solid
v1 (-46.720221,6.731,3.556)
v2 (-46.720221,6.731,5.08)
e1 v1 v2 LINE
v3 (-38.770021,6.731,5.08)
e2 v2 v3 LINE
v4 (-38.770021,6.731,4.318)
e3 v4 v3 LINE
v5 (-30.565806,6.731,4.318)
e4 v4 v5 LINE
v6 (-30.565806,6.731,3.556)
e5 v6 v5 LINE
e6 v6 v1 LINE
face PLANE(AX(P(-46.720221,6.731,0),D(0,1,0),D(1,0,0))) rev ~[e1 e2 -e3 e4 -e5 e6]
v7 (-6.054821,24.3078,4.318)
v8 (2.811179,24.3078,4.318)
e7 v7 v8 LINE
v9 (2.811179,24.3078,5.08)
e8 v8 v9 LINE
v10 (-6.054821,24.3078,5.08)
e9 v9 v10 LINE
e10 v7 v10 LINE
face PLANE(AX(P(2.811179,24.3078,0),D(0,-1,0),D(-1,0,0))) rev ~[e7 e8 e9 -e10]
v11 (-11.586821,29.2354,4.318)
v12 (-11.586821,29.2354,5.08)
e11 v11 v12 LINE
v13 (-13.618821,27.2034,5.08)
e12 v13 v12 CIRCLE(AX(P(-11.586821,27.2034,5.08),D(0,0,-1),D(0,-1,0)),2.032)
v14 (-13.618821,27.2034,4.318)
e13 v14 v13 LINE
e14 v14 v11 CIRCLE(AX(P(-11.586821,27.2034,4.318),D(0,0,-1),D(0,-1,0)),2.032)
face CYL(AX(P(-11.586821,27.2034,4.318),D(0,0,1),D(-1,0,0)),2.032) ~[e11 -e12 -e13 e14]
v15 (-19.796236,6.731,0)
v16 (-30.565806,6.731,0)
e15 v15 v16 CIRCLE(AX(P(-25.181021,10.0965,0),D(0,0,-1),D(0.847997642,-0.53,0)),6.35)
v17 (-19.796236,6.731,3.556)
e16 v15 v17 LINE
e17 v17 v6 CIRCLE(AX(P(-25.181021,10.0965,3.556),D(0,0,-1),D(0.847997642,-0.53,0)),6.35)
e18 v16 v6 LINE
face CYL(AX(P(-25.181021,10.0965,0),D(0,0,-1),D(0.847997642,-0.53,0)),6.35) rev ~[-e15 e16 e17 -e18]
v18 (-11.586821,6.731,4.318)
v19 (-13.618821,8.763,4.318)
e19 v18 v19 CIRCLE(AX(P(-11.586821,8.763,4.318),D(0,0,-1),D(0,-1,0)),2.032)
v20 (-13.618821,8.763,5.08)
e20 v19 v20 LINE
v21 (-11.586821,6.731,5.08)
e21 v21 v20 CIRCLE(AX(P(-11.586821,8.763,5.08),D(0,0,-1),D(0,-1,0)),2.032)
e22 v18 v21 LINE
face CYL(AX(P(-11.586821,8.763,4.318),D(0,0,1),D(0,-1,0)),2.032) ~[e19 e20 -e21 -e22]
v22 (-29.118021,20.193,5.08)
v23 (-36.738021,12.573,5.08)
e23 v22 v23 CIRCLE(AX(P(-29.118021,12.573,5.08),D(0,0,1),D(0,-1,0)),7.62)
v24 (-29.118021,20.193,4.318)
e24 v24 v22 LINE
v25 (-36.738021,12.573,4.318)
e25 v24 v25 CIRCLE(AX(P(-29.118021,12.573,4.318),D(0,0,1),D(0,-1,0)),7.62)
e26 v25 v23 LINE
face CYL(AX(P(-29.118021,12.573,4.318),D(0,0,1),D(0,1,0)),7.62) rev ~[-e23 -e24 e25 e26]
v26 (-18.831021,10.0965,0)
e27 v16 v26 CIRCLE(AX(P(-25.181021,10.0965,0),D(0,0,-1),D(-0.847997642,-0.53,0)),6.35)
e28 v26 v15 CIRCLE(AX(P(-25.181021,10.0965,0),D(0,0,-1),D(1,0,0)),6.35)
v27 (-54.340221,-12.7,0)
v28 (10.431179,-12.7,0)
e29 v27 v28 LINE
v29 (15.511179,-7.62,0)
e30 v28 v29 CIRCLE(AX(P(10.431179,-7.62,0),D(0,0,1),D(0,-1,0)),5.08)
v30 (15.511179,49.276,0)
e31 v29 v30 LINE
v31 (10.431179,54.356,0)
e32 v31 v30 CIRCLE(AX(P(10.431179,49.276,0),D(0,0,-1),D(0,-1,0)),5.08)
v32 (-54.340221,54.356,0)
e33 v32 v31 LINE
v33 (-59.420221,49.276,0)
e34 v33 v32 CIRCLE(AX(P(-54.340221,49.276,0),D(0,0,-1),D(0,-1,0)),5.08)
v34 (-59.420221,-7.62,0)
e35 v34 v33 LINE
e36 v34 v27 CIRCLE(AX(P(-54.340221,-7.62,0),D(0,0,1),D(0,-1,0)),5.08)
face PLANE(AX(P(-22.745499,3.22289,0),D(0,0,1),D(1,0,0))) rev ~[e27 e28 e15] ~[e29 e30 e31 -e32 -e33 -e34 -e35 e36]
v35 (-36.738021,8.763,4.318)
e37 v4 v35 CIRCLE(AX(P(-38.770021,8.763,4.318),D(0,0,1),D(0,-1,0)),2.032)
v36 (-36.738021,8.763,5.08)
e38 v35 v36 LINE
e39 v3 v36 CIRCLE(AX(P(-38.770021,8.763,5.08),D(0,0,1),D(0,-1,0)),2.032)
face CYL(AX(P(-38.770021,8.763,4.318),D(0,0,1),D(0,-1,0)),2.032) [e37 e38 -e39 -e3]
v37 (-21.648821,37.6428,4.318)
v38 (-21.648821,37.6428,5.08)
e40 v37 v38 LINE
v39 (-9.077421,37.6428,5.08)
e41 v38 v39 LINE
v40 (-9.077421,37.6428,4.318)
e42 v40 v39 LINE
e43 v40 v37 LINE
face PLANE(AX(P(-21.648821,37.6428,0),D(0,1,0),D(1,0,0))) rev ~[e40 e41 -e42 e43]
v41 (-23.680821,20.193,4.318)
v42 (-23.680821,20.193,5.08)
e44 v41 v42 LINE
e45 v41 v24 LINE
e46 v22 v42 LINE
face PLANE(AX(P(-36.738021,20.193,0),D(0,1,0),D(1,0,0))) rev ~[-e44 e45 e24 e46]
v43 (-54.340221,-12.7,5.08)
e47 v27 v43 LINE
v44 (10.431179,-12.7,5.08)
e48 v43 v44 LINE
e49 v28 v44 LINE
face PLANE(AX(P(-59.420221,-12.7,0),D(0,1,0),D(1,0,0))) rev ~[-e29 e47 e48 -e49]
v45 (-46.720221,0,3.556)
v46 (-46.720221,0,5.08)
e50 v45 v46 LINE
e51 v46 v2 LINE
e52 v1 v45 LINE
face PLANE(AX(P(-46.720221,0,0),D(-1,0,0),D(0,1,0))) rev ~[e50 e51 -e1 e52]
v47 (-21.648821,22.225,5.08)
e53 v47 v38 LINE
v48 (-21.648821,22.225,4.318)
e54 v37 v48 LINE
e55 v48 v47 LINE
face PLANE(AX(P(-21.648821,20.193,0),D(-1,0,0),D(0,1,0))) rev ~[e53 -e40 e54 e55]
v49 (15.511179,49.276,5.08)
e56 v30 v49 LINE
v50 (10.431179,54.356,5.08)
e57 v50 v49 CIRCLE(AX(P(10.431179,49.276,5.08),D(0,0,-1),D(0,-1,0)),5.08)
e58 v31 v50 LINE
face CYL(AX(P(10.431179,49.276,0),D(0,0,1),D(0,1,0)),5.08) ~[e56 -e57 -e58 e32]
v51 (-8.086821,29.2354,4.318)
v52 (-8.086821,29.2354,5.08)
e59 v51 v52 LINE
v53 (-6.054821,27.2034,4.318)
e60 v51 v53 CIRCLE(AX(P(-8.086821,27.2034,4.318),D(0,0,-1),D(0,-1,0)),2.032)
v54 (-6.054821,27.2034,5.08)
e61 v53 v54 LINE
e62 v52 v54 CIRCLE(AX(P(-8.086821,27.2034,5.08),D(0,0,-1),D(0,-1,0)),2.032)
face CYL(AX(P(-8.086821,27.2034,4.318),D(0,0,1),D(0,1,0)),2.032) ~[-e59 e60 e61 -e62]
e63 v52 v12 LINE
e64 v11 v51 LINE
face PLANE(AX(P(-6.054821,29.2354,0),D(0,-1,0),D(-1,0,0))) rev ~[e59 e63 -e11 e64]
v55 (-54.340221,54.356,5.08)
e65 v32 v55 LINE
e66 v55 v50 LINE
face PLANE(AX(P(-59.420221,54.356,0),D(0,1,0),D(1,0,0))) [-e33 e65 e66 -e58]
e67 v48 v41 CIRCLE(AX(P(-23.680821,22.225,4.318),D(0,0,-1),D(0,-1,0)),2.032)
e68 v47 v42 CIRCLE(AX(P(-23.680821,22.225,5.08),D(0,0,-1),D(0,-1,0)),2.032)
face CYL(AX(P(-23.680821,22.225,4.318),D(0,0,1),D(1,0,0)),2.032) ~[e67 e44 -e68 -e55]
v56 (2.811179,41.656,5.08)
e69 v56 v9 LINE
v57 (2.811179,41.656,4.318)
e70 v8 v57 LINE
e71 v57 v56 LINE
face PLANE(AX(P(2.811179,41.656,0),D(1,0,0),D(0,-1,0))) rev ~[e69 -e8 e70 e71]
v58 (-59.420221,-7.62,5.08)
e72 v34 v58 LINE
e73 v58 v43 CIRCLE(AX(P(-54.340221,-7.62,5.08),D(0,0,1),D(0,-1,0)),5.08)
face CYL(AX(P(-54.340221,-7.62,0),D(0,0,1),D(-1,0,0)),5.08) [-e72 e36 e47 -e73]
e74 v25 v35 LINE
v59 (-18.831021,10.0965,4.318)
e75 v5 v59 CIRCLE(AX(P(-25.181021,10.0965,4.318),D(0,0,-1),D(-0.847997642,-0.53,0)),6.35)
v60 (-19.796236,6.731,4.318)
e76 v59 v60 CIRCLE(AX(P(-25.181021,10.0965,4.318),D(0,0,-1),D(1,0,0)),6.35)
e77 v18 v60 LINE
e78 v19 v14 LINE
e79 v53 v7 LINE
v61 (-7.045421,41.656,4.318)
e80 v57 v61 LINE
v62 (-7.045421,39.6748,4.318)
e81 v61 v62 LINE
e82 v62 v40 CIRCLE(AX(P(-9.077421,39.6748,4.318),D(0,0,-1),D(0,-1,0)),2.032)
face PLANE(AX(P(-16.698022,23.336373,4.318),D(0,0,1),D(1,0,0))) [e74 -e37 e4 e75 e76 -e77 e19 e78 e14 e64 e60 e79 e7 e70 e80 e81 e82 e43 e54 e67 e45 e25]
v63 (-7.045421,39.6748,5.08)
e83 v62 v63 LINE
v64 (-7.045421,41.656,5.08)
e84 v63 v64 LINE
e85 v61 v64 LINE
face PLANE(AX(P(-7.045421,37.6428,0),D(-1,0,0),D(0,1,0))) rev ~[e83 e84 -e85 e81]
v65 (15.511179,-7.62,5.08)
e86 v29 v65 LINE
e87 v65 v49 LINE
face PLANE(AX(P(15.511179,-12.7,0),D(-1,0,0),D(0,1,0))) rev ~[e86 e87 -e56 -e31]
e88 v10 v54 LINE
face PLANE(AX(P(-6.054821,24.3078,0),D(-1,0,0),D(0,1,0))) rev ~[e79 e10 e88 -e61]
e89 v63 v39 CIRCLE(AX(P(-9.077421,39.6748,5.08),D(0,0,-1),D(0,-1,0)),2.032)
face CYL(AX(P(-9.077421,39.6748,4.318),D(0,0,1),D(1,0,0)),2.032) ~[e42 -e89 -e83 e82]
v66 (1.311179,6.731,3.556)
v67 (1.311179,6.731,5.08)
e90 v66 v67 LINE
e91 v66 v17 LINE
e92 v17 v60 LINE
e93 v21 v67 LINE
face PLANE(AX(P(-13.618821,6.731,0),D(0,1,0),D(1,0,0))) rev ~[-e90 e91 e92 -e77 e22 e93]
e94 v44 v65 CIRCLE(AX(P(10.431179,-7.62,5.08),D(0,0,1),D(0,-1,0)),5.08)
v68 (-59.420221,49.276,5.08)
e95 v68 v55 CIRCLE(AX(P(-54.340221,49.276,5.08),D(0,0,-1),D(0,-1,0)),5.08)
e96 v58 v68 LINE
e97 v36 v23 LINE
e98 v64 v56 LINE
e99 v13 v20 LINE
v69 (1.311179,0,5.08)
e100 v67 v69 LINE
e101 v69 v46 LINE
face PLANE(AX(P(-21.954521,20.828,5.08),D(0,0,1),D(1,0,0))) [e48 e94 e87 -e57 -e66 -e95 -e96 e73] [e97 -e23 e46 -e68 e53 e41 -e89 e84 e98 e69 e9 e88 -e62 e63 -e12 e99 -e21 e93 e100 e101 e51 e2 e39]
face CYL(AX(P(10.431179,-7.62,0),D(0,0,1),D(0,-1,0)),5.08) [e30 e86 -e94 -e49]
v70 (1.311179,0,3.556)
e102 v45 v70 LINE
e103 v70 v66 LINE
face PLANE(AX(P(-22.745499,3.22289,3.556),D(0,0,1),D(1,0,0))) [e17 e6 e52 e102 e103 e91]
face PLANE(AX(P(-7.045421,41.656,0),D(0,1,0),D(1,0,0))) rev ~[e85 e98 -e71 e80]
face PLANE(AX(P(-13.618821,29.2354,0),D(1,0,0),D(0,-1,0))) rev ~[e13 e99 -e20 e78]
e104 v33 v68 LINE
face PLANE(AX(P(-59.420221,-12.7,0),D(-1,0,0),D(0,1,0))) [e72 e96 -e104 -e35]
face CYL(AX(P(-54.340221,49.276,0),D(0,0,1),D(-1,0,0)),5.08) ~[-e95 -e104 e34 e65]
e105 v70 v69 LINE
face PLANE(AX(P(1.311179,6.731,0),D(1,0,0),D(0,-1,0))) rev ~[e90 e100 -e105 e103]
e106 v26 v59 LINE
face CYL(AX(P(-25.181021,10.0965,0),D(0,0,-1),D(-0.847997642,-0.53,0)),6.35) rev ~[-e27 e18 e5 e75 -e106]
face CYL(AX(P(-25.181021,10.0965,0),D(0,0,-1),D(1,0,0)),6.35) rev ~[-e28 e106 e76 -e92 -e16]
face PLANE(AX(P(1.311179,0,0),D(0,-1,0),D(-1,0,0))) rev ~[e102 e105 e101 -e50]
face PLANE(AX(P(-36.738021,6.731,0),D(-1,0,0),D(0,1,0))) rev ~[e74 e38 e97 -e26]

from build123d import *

# Parameters (mm, degrees)
F1_DEPTH = 4.318
F0_W     = 74.9314
F0_H     = 67.056
F2_DEPTH = 5.08
F3_DEPTH = 3.556
F4_R     = 2.032
F5_R     = 7.62
F6_R     = 5.08


# Not quite as in the source:
# - a feature names something its author has since deleted; it is built from what else it names


with BuildPart() as f1:
    # F0 (on Top) → F1 (new body)
    with BuildSketch(Plane.XY):
        with BuildLine():
            Line((2.8111794461, 24.3078), (2.8111794461, 41.656))
            Line((2.8111794461, 41.656), (-7.0454205539, 41.656))
            Line((-7.0454205539, 41.656), (-7.0454205539, 37.6428))
            Line((-7.0454205539, 37.6428), (-21.6488205539, 37.6428))
            Line((-21.6488205539, 37.6428), (-21.6488205539, 20.193))
            Line((-21.6488205539, 20.193), (-36.7380205539, 20.193))
            Line((-36.7380205539, 20.193), (-36.7380205539, 6.731))
            Line((-36.7380205539, 6.731), (-30.5658055774, 6.731))
            ThreePointArc((-30.5658055774, 6.731), (-26.9316083266, 16.200428444), (-18.8310205539, 10.0965))
            ThreePointArc((-18.8310205539, 10.0965), (-19.0770921098, 8.3459122272), (-19.7962355303, 6.731))
            Line((-19.7962355303, 6.731), (-13.6188205539, 6.731))
            Line((-13.6188205539, 6.731), (-13.6188205539, 29.2354))
            Line((-13.6188205539, 29.2354), (-6.0548205539, 29.2354))
            Line((-6.0548205539, 29.2354), (-6.0548205539, 24.3078))
            Line((-6.0548205539, 24.3078), (2.8111794461, 24.3078))
        make_face()
    extrude(amount=F1_DEPTH)

    # F0 (on Top) → F2 (join)
    with BuildSketch(Plane.XY):
        with Locations((-21.9545205539, 20.828)):
            Rectangle(F0_W, F0_H)
        Polygon((-7.0454205539, 41.656), (2.8111794461, 41.656), (2.8111794461, 24.3078), (-6.0548205539, 24.3078), (-6.0548205539, 29.2354), (-13.6188205539, 29.2354), (-13.6188205539, 6.731), (1.3111794461, 6.731), (1.3111794461, 0), (-46.7202205539, 0), (-46.7202205539, 6.731), (-36.7380205539, 6.731), (-36.7380205539, 20.193), (-21.6488205539, 20.193), (-21.6488205539, 37.6428), (-7.0454205539, 37.6428), align=None, mode=Mode.SUBTRACT)
    extrude(amount=F2_DEPTH)

    # F0 (on Top) → F3 (join)
    with BuildSketch(Plane.XY):
        with BuildLine():
            Line((1.3111794461, 6.731), (-13.6188205539, 6.731))
            Line((-13.6188205539, 6.731), (-19.7962355303, 6.731))
            ThreePointArc((-19.7962355303, 6.731), (-25.1810205539, 3.7465), (-30.5658055774, 6.731))
            Line((-30.5658055774, 6.731), (-36.7380205539, 6.731))
            Line((-36.7380205539, 6.731), (-46.7202205539, 6.731))
            Line((-46.7202205539, 6.731), (-46.7202205539, 0))
            Line((-46.7202205539, 0), (1.3111794461, 0))
            Line((1.3111794461, 0), (1.3111794461, 6.731))
        make_face()
    extrude(amount=F3_DEPTH)

    # F4
    f4_edges = [f1.edges().sort_by_distance(p)[0] for p in [
        (-7.045421, 37.6428, 4.699),
        (-13.618821, 29.2354, 4.699),
        (-21.648821, 20.193, 4.699),
        (-13.618821, 6.731, 4.699),
        (-36.738021, 6.731, 4.699),
        (-6.054821, 29.2354, 4.699),
    ]]
    fillet(f4_edges, radius=F4_R)

    # F5
    f5_edges = [f1.edges().sort_by_distance(p)[0] for p in [
        (-36.738021, 20.193, 4.699),
    ]]
    fillet(f5_edges, radius=F5_R)

    # F6
    f6_edges = [f1.edges().sort_by_distance(p)[0] for p in [
        (15.511179, -12.7, 2.54),
        (15.511179, 54.356, 2.54),
        (-59.420221, 54.356, 2.54),
        (-59.420221, -12.7, 2.54),
    ]]
    fillet(f6_edges, radius=F6_R)


solid = f1.part
